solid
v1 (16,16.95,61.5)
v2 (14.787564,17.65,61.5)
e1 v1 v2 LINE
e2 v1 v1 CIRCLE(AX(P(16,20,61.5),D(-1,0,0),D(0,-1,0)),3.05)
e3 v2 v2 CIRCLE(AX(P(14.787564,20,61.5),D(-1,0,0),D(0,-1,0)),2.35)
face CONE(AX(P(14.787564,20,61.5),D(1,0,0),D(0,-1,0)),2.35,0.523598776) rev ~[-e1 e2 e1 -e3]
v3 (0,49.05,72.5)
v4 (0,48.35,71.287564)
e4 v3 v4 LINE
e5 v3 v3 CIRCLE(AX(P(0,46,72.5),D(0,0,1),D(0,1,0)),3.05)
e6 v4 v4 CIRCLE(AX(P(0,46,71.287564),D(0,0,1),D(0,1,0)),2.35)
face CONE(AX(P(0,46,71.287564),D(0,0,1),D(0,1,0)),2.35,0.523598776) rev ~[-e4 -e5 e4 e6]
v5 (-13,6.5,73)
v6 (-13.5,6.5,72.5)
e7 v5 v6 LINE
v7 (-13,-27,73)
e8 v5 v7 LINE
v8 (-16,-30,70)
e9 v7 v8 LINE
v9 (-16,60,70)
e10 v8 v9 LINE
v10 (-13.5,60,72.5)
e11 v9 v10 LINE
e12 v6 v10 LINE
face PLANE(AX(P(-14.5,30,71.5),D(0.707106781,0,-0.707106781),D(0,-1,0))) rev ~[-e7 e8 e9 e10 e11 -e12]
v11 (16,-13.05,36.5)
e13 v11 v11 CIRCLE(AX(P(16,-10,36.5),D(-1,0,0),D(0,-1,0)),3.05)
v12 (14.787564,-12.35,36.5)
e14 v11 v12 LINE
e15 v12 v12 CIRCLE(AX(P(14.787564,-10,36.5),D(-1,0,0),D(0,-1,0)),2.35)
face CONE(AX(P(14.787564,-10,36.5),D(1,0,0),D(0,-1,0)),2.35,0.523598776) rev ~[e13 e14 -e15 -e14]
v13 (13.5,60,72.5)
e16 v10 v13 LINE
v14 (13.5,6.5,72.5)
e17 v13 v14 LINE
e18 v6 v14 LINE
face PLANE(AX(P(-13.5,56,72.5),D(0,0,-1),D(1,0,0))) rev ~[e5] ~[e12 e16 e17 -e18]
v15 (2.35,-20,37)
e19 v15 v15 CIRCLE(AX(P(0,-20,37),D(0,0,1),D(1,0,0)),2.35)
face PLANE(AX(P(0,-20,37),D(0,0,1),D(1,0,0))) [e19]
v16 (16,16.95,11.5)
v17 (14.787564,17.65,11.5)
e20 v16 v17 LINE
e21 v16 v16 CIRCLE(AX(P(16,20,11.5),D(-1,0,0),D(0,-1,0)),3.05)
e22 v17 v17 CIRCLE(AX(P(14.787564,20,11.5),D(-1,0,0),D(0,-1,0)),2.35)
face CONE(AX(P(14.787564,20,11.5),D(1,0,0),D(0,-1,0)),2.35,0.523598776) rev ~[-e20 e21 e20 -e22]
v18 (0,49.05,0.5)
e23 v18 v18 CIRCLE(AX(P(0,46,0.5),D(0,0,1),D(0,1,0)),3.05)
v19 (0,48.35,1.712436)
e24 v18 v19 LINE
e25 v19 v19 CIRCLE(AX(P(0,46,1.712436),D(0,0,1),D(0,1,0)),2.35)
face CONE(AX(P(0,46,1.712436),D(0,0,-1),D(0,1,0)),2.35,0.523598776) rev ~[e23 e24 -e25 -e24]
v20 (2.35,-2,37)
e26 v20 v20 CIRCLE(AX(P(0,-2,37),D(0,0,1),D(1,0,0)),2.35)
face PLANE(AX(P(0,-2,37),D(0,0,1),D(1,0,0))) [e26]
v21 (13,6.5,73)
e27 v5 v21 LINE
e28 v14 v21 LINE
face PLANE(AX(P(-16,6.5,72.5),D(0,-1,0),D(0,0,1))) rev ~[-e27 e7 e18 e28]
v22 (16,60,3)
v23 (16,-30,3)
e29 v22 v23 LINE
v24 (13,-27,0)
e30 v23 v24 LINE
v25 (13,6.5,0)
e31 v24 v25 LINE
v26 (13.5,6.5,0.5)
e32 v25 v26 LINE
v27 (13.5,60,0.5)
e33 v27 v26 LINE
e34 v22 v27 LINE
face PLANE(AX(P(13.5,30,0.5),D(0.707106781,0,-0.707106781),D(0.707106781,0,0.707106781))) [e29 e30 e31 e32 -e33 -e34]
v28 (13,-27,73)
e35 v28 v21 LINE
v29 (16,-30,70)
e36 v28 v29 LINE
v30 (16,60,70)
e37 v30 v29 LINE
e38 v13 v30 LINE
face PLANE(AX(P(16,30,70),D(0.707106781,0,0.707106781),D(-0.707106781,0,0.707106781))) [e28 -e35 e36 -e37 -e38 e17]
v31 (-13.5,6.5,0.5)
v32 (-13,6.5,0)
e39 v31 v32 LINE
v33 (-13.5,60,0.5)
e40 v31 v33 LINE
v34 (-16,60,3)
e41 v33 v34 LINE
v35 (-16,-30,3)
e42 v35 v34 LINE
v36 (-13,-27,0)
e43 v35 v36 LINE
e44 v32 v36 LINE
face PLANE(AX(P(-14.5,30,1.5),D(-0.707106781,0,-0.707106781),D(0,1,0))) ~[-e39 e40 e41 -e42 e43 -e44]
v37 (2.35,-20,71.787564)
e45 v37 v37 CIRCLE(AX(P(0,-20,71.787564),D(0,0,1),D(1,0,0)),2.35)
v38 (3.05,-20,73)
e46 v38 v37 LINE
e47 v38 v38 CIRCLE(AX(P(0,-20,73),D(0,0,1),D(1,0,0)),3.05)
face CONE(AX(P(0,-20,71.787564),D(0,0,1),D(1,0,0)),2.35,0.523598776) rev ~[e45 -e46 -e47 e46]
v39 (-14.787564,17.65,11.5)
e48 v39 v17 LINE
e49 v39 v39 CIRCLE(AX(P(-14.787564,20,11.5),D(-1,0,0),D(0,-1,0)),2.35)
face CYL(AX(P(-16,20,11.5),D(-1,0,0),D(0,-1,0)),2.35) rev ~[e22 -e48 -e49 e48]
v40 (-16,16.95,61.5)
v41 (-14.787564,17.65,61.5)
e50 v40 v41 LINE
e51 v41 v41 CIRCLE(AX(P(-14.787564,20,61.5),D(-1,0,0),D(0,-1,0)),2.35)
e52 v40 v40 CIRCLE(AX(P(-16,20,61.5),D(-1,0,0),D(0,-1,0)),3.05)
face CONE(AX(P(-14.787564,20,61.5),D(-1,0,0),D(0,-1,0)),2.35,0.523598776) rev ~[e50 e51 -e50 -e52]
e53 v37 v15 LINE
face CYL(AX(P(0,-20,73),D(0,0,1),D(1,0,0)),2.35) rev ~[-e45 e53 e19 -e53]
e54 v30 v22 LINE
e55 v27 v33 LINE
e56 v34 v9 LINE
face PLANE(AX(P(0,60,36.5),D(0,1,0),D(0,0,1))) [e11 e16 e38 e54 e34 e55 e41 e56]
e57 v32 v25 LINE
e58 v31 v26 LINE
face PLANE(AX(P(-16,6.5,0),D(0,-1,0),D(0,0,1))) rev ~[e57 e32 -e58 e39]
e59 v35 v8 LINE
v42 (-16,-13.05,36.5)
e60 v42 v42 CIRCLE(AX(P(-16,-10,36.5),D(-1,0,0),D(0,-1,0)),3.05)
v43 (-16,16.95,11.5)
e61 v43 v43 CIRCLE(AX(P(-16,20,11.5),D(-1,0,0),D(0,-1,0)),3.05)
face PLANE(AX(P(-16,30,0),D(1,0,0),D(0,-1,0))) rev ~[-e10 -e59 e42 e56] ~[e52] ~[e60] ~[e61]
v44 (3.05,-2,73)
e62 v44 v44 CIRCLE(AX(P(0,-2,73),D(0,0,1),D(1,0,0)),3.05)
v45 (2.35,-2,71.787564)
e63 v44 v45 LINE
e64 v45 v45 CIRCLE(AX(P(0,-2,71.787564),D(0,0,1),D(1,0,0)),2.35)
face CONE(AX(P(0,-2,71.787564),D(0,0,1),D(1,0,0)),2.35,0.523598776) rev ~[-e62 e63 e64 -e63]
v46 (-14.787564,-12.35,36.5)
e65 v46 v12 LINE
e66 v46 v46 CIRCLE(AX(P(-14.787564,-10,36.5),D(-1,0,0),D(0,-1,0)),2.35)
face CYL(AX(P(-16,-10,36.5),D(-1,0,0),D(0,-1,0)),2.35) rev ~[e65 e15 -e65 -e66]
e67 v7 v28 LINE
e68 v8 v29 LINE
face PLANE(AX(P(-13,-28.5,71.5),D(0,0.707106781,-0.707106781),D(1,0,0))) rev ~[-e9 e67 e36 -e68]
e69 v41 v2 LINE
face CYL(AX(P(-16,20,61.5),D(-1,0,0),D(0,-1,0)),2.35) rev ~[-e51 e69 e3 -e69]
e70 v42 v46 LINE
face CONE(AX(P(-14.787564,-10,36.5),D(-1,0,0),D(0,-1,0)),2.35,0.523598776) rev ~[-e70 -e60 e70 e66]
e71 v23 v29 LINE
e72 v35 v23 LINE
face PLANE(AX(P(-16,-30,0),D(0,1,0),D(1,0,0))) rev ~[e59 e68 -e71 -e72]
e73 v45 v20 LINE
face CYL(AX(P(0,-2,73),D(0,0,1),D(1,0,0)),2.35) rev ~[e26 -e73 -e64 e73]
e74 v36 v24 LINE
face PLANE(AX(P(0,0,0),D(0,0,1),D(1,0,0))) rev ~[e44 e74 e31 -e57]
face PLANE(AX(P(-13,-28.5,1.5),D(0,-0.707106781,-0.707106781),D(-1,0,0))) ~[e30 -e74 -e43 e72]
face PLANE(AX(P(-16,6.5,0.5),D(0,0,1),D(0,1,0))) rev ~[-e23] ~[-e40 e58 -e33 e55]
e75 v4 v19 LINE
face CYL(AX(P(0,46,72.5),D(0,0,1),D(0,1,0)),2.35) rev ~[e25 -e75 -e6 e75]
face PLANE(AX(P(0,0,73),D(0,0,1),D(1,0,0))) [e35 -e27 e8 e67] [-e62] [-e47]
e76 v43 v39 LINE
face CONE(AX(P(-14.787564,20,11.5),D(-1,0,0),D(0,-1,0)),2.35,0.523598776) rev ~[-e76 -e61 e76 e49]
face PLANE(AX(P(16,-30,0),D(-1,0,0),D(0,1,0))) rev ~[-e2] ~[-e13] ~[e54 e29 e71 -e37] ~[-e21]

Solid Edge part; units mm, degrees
sketch "Sketch1" plane through (0, 0, 0) normal (0, 0, 1) x (1, 0, 0)
  line L0 (-16, -30) -> (16, -30)
  line L1 (16, -30) -> (16, 30)
  line L2 (16, 30) -> (-16, 30)
  line L3 (-16, 30) -> (-16, -30)
  dimension "D1" = 32
  dimension "D2" = 60
extrude "Protrusion1" add sketch "Sketch1" along normal blind 73
sketch "Sketch2" plane through (0, 0, 73) normal (0, 0, 1) x (1, 0, 0)
  circle A0 centre (0, -20) radius 2.35
  circle A1 centre (0, -2) radius 2.35
  dimension "D1" = 4.7
  dimension "D2" = 18
  dimension "D3" = 10
extrude "Extrusionsausschnitt_1" cut sketch "Sketch2" against normal blind 36
chamfer "Fase_3" distance 0.7 angle 60 2 edges at (-2.35, -2, 73) (-2.35, -20, 73) measured on face at (-10.9867, -19.4, 73)
chamfer "Fase_6" distance 3 angle 45 4 edges at (-16, 0, 73) (-16, 0, 0) (16, 0, 73) (16, 0, 0)
chamfer "Fase_7" distance 3 angle 45 2 edges at (0, -30, 73) (0, -30, 0)
sketch "Sketch3" plane through (-16, 0, 36.5) normal (-1, 0, 0) x (0, -1, 0)
  circle A0 centre (-20, 25) radius 2.35
  circle A1 centre (-20, -25) radius 2.35
  circle A2 centre (10, 0) radius 2.35
  dimension "D1" = 4.7
  dimension "D2" = 50
  dimension "D3" = 10
  dimension "D4" = 30
extrude "Cutout1" cut sketch "Sketch3" against normal through all
chamfer "Fase_9" distance 0.7 angle 60 6 edges at (-16, 22.35, 61.5) (-16, -7.65, 36.5) (-16, 22.35, 11.5) (16, 20, 59.15) (16, 20, 9.15) (16, -10, 34.15) measured on face at (-16, 20.6, 58.1633) measured on face at (16, -20.6, 58.1633)
sketch "Sketch4" plane through (-16, 0, 36.5) normal (-1, 0, 0) x (0, -1, 0)
  line L0 (-6.5, 36.5) -> (-30, 36.5)
  line L1 (-30, 36.5) -> (-30, 36)
  line L2 (-30, 36) -> (-6.5, 36)
  line L3 (-6.5, 36) -> (-6.5, 36.5)
  line L4 (-30, -36.5) -> (-6.5, -36.5)
  line L5 (-6.5, -36.5) -> (-6.5, -36)
  line L6 (-6.5, -36) -> (-30, -36)
  line L7 (-30, -36) -> (-30, -36.5)
  dimension "D1" = 0.5
  dimension "D2" = 36.5
  dimension "D3" = 0.5
  dimension "D4" = 36.5
extrude "Cutout2" cut sketch "Sketch4" against normal through all
sketch "Sketch5" plane through (0, 30, 36.5) normal (0, 1, 0) x (1, 0, 0)
  line L0 (-16, 33.5) -> (-13.5, 36)
  line L1 (-13.5, 36) -> (13.5, 36)
  line L2 (13.5, 36) -> (16, 33.5)
  line L3 (16, 33.5) -> (16, -33.5)
  line L4 (16, -33.5) -> (13.5, -36)
  line L5 (13.5, -36) -> (-13.5, -36)
  line L6 (-13.5, -36) -> (-16, -33.5)
  line L7 (-16, -33.5) -> (-16, 33.5)
extrude "Extrusionsausprägung_2" add sketch "Sketch5" along normal blind 26
sketch "Sketch6" plane through (0, 36.25, 72.5) normal (0, 0, 1) x (0, 1, 0)
  circle A0 centre (9.75, 0) radius 2.35
  dimension "D1" = 10
extrude "Cutout3" cut sketch "Sketch6" against normal through all
chamfer "Fase_10" distance 0.7 angle 60 2 edges at (0, 43.65, 72.5) (-2.35, 46, 0.5) measured on face at (8.73, 48.245, 72.5) measured on face at (8.73, 14.255, 0.5)
sketch "Sketch7" plane through (0, 56, 36.5) normal (0, 1, 0) x (-1, 0, 0)
  line L0 (-13.5, 36) -> (-16, 33.5)
  line L1 (-16, 33.5) -> (-16, -33.5)
  line L2 (-16, -33.5) -> (-13.5, -36)
  line L3 (-13.5, -36) -> (13.5, -36)
  line L4 (13.5, -36) -> (16, -33.5)
  line L5 (16, -33.5) -> (16, 33.5)
  line L6 (16, 33.5) -> (13.5, 36)
  line L7 (13.5, 36) -> (-13.5, 36)
extrude "Extrusionsausprägung_3" add sketch "Sketch7" along normal blind 4
properties material "Nylon, allgemein"
